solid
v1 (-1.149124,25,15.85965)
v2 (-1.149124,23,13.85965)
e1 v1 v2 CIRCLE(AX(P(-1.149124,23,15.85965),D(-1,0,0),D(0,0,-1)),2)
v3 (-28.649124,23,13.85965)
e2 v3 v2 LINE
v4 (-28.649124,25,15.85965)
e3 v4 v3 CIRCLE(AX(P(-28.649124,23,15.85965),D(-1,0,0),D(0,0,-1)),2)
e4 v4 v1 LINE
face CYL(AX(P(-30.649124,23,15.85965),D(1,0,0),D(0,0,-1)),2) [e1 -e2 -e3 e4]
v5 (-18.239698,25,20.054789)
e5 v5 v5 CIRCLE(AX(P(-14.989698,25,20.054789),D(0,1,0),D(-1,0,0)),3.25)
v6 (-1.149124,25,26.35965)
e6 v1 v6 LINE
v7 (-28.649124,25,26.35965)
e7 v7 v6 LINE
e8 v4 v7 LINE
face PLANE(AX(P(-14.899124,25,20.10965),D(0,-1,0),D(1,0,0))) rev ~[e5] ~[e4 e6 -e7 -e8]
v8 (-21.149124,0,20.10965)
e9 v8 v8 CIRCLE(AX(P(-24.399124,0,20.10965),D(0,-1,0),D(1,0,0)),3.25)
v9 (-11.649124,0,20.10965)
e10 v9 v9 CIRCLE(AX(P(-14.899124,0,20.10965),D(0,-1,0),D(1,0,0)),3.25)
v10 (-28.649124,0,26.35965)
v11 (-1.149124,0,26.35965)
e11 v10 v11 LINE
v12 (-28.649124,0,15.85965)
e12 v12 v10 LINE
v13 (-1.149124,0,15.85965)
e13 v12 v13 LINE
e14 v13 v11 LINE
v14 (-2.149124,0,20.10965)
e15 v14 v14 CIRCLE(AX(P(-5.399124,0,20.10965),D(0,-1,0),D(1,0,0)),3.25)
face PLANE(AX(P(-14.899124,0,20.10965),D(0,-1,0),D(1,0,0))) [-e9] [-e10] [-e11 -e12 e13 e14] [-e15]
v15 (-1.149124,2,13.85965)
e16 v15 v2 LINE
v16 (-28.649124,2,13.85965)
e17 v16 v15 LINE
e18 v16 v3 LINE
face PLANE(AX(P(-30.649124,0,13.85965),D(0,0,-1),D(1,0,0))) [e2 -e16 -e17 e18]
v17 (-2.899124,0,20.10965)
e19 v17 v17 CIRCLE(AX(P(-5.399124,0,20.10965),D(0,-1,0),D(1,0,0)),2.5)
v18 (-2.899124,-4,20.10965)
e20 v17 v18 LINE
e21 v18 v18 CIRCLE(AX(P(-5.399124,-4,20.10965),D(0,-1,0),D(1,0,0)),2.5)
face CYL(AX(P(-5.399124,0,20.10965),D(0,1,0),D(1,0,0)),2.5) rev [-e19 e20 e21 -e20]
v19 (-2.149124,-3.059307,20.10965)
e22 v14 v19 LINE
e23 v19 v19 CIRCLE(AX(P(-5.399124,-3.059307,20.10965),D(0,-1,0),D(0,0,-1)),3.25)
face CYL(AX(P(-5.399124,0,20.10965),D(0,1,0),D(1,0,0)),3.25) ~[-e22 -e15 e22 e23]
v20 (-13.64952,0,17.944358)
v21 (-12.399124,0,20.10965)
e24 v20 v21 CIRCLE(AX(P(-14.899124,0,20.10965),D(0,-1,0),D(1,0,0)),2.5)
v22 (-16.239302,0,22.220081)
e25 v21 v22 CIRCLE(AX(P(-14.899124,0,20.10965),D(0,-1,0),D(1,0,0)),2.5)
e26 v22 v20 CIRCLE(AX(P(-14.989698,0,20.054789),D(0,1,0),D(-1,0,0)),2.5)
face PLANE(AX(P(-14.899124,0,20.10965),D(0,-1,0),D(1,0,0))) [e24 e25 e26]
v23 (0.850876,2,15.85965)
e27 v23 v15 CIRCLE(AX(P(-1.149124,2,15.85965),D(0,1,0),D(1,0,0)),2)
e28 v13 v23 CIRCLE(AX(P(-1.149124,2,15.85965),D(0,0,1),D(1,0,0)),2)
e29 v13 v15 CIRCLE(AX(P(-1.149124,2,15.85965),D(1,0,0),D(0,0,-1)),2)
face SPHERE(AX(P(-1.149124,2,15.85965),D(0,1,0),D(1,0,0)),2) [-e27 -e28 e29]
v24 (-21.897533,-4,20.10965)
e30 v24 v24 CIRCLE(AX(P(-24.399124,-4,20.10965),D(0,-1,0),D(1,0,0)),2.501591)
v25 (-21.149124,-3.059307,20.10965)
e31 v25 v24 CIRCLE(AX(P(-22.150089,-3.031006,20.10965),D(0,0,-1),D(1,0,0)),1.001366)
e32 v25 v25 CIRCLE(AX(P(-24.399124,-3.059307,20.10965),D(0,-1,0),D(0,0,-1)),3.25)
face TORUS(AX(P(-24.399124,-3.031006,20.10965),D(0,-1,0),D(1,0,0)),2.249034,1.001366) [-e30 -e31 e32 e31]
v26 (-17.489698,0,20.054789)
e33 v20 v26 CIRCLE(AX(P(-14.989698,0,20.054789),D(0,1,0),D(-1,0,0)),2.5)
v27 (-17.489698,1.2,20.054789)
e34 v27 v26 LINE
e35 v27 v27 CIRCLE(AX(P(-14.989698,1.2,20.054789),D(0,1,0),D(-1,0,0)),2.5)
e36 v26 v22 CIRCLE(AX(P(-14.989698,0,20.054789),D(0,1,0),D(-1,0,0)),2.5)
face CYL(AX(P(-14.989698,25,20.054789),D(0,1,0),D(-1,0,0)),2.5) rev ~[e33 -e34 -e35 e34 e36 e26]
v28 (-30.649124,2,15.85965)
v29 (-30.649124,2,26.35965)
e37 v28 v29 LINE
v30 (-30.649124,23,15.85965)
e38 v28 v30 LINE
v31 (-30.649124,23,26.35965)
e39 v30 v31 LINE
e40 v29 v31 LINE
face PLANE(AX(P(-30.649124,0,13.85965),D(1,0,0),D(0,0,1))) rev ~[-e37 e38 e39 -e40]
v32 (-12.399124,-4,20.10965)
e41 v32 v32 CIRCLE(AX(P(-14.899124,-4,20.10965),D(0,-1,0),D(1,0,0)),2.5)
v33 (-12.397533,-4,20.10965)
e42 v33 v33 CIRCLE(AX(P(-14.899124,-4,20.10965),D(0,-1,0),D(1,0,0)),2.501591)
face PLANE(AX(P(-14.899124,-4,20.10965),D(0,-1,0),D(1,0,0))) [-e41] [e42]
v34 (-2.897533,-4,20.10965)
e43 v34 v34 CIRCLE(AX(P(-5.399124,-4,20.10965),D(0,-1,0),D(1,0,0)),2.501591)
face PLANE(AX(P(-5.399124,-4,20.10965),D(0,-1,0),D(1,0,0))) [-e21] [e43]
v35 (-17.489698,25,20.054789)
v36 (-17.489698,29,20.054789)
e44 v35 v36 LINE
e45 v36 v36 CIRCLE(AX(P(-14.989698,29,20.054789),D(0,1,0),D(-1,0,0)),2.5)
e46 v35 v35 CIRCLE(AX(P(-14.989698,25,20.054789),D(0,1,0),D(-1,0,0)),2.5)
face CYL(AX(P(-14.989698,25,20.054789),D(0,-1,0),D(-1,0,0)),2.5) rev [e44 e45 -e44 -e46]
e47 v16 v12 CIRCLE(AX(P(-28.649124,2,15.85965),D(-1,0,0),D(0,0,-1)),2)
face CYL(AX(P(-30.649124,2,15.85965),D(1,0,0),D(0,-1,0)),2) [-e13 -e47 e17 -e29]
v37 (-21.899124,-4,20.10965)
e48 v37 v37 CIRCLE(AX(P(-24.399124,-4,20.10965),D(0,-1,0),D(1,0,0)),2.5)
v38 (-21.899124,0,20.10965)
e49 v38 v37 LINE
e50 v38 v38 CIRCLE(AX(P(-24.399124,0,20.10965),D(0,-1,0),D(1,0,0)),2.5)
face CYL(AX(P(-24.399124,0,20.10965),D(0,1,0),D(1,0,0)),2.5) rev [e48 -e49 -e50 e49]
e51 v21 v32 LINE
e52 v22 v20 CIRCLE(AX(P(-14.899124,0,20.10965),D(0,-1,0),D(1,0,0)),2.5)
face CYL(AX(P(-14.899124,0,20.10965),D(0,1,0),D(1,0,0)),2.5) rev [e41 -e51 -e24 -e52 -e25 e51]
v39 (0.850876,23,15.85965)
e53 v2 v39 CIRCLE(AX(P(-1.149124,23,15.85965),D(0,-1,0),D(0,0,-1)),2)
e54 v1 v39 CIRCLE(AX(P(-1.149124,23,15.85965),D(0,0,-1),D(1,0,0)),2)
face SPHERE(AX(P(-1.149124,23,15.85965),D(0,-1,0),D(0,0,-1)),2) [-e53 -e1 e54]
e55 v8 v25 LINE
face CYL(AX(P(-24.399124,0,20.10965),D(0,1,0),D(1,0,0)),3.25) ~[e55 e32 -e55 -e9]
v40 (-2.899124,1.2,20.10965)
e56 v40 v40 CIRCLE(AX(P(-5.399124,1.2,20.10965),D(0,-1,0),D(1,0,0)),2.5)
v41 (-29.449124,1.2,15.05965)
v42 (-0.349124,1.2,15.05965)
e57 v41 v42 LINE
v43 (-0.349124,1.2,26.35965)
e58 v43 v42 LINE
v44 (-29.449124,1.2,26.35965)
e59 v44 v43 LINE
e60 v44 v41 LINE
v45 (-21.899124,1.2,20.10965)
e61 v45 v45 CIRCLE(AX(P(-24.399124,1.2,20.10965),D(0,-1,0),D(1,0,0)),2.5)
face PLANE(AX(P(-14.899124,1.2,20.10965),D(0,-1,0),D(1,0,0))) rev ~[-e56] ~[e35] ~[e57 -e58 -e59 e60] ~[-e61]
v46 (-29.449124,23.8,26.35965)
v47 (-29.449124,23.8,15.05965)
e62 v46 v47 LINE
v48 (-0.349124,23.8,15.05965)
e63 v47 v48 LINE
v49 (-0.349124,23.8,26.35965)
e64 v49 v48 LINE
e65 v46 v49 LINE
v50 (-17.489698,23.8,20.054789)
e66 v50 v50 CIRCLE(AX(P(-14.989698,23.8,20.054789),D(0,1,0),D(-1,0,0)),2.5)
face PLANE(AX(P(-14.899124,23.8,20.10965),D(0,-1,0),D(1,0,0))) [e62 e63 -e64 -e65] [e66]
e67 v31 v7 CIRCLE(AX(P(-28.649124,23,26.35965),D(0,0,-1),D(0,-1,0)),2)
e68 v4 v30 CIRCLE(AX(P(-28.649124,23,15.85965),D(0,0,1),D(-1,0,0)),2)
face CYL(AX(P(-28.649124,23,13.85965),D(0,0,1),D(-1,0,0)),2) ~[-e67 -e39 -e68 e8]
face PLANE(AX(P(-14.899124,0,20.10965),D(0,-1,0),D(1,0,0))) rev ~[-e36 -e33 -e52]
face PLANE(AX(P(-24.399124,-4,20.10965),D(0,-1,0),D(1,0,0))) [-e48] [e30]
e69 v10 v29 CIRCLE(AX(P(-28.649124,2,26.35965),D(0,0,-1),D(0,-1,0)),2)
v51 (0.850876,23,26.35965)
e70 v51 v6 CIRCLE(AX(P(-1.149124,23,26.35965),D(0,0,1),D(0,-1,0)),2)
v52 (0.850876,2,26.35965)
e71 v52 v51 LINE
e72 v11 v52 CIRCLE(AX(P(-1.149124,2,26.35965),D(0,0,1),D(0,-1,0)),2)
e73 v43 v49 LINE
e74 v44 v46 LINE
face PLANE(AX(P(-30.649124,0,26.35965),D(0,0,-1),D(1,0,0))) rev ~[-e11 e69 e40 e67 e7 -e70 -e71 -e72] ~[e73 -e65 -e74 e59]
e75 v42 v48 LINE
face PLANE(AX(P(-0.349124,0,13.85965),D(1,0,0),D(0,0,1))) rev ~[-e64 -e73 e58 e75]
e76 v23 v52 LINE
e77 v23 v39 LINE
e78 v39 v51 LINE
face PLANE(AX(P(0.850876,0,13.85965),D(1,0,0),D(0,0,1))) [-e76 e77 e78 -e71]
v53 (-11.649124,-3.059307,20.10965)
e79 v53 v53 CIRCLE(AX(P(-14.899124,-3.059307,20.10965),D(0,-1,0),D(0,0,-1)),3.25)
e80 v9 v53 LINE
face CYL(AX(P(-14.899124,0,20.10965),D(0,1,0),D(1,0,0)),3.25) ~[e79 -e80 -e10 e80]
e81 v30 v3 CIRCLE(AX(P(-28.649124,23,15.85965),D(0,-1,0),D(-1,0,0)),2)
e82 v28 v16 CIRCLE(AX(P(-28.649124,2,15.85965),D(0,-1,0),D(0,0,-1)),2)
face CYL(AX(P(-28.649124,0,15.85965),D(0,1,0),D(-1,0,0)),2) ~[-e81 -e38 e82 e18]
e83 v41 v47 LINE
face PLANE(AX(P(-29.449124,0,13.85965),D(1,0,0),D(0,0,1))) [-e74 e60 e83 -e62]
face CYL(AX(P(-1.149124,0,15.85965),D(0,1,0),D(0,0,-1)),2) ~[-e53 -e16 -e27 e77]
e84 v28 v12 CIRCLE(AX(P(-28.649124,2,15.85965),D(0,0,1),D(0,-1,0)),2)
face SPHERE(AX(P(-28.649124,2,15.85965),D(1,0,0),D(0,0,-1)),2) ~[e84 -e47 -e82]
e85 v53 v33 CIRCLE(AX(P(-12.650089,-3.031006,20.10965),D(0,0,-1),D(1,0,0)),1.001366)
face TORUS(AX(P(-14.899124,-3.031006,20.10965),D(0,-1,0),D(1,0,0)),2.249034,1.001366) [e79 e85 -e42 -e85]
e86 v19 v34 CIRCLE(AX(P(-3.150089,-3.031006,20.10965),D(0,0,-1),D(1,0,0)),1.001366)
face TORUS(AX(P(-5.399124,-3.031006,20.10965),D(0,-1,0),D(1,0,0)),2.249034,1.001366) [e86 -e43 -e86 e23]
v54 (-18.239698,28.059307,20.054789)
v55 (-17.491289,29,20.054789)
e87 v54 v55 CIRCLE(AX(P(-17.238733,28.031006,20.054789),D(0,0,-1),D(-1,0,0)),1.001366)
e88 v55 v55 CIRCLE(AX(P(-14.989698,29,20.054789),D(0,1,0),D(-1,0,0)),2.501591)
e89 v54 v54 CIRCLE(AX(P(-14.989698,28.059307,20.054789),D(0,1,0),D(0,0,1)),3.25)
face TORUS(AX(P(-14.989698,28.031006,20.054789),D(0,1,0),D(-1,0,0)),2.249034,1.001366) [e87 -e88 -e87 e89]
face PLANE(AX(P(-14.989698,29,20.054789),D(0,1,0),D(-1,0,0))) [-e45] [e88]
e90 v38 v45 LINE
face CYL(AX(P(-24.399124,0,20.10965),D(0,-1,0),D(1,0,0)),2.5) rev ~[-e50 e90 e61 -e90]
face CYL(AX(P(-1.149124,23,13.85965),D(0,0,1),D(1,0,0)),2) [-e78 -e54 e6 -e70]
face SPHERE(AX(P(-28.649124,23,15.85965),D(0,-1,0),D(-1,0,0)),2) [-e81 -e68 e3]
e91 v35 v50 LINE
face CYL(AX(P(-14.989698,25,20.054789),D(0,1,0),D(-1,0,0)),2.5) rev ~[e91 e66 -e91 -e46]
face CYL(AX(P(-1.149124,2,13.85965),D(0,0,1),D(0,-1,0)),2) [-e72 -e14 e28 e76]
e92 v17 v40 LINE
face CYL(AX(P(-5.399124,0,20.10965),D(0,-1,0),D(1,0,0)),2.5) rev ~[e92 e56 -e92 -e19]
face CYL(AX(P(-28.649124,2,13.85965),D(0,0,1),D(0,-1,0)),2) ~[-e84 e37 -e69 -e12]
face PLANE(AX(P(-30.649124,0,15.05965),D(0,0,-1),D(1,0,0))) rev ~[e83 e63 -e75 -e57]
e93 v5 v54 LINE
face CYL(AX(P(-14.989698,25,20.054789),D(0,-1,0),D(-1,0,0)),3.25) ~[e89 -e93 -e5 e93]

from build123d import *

# Parameters (mm, degrees)
F0_W     = 31.5
F0_H     = 12.5
F0_R     = 3.25
F0_R_2   = 2.5
F1_DEPTH = 25
F2_T     = -1.2
F3_R     = 3.25
F3_R_2   = 2.5
F4_DEPTH = 4
F5_DEPTH = 25
F6_DEPTH = 8
F7_DEPTH = 4
F8_R     = 2


# Not quite as in the source:
# - a fillet or chamfer that OpenCascade refuses, or shapes differently, is made with other operations: its cross-section is extruded or revolved along the edge and cut away or added


with BuildPart() as f1:
    # F0 (on Front) → F1 (new body)
    with BuildSketch(Plane.XZ):
        with Locations((-14.899123773, 20.1096497476)):
            Rectangle(F0_W, F0_H)
        with Locations((-24.399123773, 20.1096497476)):
            Circle(F0_R, mode=Mode.SUBTRACT)
        with Locations((-14.899123773, 20.1096497476)):
            Circle(F0_R, mode=Mode.SUBTRACT)
        with Locations((-5.399123773, 20.1096497476)):
            Circle(F0_R, mode=Mode.SUBTRACT)
        with Locations((-5.399123773, 20.1096497476)):
            Circle(F0_R)
        with Locations((-5.399123773, 20.1096497476)):
            Circle(F0_R_2, mode=Mode.SUBTRACT)
        with Locations((-14.899123773, 20.1096497476)):
            Circle(F0_R)
        with Locations((-14.899123773, 20.1096497476)):
            Circle(F0_R_2, mode=Mode.SUBTRACT)
        with Locations((-24.399123773, 20.1096497476)):
            Circle(F0_R)
        with Locations((-24.399123773, 20.1096497476)):
            Circle(F0_R_2, mode=Mode.SUBTRACT)
        with Locations((-5.399123773, 20.1096497476)):
            Circle(F0_R_2)
        with Locations((-14.899123773, 20.1096497476)):
            Circle(F0_R_2)
        with Locations((-24.399123773, 20.1096497476)):
            Circle(F0_R_2)
    extrude(amount=-F1_DEPTH)

    # F2
    f2_openings = [f1.faces().sort_by_distance(p)[0] for p in [
        (-14.899124, 12.5, 26.35965),
    ]]
    offset(amount=F2_T, openings=f2_openings)

    # F3 (on face) → F4 (join)
    with BuildSketch(Plane(origin=(0, 25, 0), x_dir=(-1, 0, 0), z_dir=(0, 1, 0))):
        with Locations((14.9896983057, 20.05478926)):
            Circle(F3_R)
        with Locations((14.9896983057, 20.05478926)):
            Circle(F3_R_2, mode=Mode.SUBTRACT)
    extrude(amount=F4_DEPTH)

    # F5 (cut): a face of the model
    f5_faces = [f1.faces().sort_by_distance(p)[0] for p in [
        (-14.9896983057, 25, 20.05478926),
    ]]
    extrude(f5_faces, amount=-F5_DEPTH, mode=Mode.SUBTRACT)

    # F0 (on Front) → F6 (cut)
    with BuildSketch(Plane.XZ):
        with Locations((-24.399123773, 20.1096497476)):
            Circle(F0_R_2)
        with Locations((-5.399123773, 20.1096497476)):
            Circle(F0_R_2)
    extrude(amount=-F6_DEPTH, mode=Mode.SUBTRACT)

    # F0 (on Front) → F7 (join)
    with BuildSketch(Plane.XZ):
        with Locations((-24.399123773, 20.1096497476)):
            Circle(F0_R)
        with Locations((-24.399123773, 20.1096497476)):
            Circle(F0_R_2, mode=Mode.SUBTRACT)
        with Locations((-14.899123773, 20.1096497476)):
            Circle(F0_R)
        with Locations((-14.899123773, 20.1096497476)):
            Circle(F0_R_2, mode=Mode.SUBTRACT)
        with Locations((-5.399123773, 20.1096497476)):
            Circle(F0_R)
        with Locations((-5.399123773, 20.1096497476)):
            Circle(F0_R_2, mode=Mode.SUBTRACT)
    extrude(amount=F7_DEPTH)

    # F8
    f8_edges = [f1.edges().sort_by_distance(p)[0] for p in [
        (0.850876, 12.5, 13.85965),
        (0.850876, 0, 20.10965),
        (-14.899124, 0, 13.85965),
        (-30.649124, 12.5, 13.85965),
        (-30.649124, 0, 20.10965),
        (-30.649124, 25, 20.10965),
        (-14.899124, 25, 13.85965),
        (0.850876, 25, 20.10965),
    ]]
    fillet(f8_edges, radius=F8_R)

    # F9: fillet of radius 1 on 4 edges, made by hand

    # F9_s1 → F9_t2 (revolve, cut)
    with BuildSketch(Plane.XY.offset(20.1096497476)):
        with BuildLine():
            ThreePointArc((-2.148723773, -3.0310064355), (-2.3582112834, -3.6439193102), (-2.8990234836, -4.0003872235))
            Line((-2.8990234836, -4.0003872235), (-2.8739168861, -4.0973253023))
            ThreePointArc((-2.8739168861, -4.0973253023), (-2.5240736283, -4.1001365685), (-2.149123773, -4.1001365685))
            Line((-2.149123773, -4.1001365685), (-2.0489872044, -4))
            ThreePointArc((-2.0489872044, -4), (-2.0489872044, -3.5155032177), (-2.0485872044, -3.0310064355))
            Line((-2.0485872044, -3.0310064355), (-2.148723773, -3.0310064355))
        make_face()
    revolve(axis=Axis((-5.399123773, -4, 20.1096497476), (0, -1, 0)), mode=Mode.SUBTRACT)

    # F9_s3 → F9_t4 (revolve, cut)
    with BuildSketch(Plane.XY.offset(20.1096497476)):
        with BuildLine():
            ThreePointArc((-11.648723773, -3.0310064355), (-11.8582112834, -3.6439193102), (-12.3990234836, -4.0003872235))
            Line((-12.3990234836, -4.0003872235), (-12.3739168861, -4.0973253023))
            ThreePointArc((-12.3739168861, -4.0973253023), (-12.0240736283, -4.1001365685), (-11.649123773, -4.1001365685))
            Line((-11.649123773, -4.1001365685), (-11.5489872044, -4))
            ThreePointArc((-11.5489872044, -4), (-11.5489872044, -3.5155032177), (-11.5485872044, -3.0310064355))
            Line((-11.5485872044, -3.0310064355), (-11.648723773, -3.0310064355))
        make_face()
    revolve(axis=Axis((-14.899123773, -4, 20.1096497476), (0, -1, 0)), mode=Mode.SUBTRACT)

    # F9_s5 → F9_t6 (revolve, cut)
    with BuildSketch(Plane.XY.offset(20.1096497476)):
        with BuildLine():
            ThreePointArc((-21.148723773, -3.0310064355), (-21.3582112834, -3.6439193102), (-21.8990234836, -4.0003872235))
            Line((-21.8990234836, -4.0003872235), (-21.8739168861, -4.0973253023))
            ThreePointArc((-21.8739168861, -4.0973253023), (-21.5240736283, -4.1001365685), (-21.149123773, -4.1001365685))
            Line((-21.149123773, -4.1001365685), (-21.0489872044, -4))
            ThreePointArc((-21.0489872044, -4), (-21.0489872044, -3.5155032177), (-21.0485872044, -3.0310064355))
            Line((-21.0485872044, -3.0310064355), (-21.148723773, -3.0310064355))
        make_face()
    revolve(axis=Axis((-24.399123773, -4, 20.1096497476), (0, -1, 0)), mode=Mode.SUBTRACT)

    # F9_s7 → F9_t8 (revolve, cut)
    with BuildSketch(Plane.XY.offset(20.05478926)):
        with BuildLine():
            ThreePointArc((-18.2400983057, 28.0310064355), (-18.0306107953, 28.6439193102), (-17.4897985952, 29.0003872235))
            Line((-17.4897985952, 29.0003872235), (-17.5149051926, 29.0973253023))
            ThreePointArc((-17.5149051926, 29.0973253023), (-17.8647484504, 29.1001365685), (-18.2396983057, 29.1001365685))
            Line((-18.2396983057, 29.1001365685), (-18.3398348743, 29))
            ThreePointArc((-18.3398348743, 29), (-18.3398348743, 28.5155032177), (-18.3402348743, 28.0310064355))
            Line((-18.3402348743, 28.0310064355), (-18.2400983057, 28.0310064355))
        make_face()
    revolve(axis=Axis((-14.9896983057, 29, 20.05478926), (0, 1, 0)), mode=Mode.SUBTRACT)


solid = f1.part
